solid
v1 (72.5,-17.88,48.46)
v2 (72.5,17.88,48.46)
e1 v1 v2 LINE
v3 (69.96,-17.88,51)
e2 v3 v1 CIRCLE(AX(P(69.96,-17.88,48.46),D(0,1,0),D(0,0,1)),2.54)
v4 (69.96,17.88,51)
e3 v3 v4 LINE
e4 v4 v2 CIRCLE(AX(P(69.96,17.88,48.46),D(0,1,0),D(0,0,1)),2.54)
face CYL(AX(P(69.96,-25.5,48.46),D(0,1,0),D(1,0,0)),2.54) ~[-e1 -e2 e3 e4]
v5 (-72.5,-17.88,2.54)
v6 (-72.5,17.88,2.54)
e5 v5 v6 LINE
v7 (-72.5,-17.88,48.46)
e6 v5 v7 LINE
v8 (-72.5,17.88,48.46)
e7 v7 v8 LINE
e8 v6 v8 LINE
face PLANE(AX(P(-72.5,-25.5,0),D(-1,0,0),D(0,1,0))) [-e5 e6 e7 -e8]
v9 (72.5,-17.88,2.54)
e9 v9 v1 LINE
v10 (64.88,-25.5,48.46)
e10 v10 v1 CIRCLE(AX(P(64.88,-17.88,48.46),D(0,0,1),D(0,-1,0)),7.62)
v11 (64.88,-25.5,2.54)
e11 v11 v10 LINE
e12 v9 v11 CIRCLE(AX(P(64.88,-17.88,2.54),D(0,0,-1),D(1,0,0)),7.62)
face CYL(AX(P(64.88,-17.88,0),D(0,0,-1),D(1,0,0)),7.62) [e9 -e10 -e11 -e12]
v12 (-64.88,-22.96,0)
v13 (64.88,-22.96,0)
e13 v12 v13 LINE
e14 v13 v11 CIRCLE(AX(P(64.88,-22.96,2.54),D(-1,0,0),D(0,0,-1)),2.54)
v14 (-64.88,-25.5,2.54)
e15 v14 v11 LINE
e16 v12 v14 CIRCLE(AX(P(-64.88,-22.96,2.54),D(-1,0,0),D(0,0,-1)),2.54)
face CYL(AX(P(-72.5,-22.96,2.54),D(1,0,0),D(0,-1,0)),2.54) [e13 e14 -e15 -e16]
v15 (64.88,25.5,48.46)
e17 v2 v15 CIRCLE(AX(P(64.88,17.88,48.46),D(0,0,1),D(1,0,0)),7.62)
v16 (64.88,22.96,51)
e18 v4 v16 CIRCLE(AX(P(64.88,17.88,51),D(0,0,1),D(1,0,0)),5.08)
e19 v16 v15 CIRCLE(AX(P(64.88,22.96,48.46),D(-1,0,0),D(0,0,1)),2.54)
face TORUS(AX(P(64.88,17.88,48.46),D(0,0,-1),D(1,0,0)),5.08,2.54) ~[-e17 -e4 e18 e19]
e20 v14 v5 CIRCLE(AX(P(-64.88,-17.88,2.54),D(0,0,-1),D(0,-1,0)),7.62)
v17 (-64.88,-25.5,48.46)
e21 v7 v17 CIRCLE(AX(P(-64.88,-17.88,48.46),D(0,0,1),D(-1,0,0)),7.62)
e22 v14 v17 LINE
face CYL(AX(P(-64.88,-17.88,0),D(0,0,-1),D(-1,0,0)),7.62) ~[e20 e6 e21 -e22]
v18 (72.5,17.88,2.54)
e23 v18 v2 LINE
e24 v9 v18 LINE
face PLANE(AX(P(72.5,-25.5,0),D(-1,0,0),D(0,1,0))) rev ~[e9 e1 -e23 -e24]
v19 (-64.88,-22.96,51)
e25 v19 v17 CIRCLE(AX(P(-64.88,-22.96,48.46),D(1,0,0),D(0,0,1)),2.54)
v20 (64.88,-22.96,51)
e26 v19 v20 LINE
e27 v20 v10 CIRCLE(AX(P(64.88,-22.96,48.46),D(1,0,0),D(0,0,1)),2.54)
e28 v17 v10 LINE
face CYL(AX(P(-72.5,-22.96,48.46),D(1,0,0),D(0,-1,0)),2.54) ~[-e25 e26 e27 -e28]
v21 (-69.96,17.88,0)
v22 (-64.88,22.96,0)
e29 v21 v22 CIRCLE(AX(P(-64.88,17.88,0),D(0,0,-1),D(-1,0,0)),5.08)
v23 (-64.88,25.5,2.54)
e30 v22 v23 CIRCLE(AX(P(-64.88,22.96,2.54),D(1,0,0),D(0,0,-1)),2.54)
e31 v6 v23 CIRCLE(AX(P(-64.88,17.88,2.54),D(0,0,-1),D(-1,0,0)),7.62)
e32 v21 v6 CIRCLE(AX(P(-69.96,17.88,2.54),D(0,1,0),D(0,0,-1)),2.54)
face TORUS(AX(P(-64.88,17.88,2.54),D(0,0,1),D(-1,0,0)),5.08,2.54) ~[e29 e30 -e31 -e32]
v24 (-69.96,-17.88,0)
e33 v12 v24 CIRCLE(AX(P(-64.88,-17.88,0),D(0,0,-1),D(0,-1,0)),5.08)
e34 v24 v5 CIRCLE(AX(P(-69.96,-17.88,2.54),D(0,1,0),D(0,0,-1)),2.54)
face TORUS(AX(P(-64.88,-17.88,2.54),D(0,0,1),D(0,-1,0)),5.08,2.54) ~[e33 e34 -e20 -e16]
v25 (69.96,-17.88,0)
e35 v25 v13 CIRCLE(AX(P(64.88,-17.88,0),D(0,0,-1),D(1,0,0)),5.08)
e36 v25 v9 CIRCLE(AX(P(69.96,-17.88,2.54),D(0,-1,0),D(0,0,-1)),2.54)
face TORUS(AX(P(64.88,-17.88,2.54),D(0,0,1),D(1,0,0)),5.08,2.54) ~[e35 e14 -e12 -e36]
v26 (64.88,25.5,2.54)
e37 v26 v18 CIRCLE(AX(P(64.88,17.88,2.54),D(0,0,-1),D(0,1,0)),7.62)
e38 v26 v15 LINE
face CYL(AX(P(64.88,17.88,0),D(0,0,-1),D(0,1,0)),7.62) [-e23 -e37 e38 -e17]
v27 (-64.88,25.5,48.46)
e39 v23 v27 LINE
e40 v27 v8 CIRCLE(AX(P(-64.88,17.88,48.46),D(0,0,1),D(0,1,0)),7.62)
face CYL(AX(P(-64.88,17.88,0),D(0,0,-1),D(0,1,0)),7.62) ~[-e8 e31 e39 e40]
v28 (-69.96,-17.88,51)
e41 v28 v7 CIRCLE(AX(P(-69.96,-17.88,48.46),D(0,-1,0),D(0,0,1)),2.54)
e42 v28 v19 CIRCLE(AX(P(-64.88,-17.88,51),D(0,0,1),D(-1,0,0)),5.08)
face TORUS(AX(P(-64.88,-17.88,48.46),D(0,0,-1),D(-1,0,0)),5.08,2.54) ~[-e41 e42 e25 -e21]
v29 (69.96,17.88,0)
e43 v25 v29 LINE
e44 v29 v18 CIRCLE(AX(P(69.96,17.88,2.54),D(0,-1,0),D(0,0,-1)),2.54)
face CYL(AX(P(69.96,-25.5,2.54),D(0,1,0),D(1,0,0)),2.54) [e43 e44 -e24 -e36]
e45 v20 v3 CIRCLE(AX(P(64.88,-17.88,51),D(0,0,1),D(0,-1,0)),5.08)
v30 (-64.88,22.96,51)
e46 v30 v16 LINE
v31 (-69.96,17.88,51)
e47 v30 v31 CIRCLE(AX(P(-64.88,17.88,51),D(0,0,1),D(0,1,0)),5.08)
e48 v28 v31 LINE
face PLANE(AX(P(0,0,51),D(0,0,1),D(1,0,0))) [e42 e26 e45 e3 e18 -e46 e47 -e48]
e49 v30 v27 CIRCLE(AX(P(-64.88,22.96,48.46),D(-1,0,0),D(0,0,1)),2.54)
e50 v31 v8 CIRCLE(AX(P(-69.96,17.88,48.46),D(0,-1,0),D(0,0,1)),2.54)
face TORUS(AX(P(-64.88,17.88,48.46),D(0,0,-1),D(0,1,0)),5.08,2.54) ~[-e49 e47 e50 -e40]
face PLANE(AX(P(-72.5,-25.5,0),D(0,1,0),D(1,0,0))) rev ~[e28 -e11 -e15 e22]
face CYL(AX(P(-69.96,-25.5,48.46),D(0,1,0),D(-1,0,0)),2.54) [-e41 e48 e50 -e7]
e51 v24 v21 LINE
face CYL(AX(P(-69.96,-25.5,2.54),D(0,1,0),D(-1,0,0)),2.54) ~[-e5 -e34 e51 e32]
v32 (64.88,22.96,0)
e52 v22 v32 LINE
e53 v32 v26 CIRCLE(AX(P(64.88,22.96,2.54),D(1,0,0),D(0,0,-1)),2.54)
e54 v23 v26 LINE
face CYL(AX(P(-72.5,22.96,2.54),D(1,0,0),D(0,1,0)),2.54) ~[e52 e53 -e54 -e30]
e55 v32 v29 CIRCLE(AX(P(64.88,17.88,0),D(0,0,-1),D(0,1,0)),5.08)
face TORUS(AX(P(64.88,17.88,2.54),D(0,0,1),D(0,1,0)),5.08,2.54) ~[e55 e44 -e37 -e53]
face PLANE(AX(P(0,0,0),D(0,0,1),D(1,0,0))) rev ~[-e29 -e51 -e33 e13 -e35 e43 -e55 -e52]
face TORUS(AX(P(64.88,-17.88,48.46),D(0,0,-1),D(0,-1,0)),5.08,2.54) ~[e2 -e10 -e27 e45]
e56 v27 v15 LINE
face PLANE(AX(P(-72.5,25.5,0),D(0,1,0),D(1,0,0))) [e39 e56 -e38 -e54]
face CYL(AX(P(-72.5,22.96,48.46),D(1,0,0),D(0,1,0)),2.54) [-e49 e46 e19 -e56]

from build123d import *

# Parameters (mm, degrees)
F0_W         = 145
F0_H         = 51
F1_DEPTH     = 51
F2_R         = 2.54
F3_T1_DEPTH  = 51
F3_T4_ANGLE  = 90
F3_T6_ANGLE  = 90
F3_T8_ANGLE  = 90
F3_T10_ANGLE = 90
F3_T12_ANGLE = 90
F3_T14_ANGLE = 90
F3_T16_ANGLE = 90
F3_T18_ANGLE = 90


# Not quite as in the source:
# - a fillet or chamfer that OpenCascade refuses, or shapes differently, is made with other operations: its cross-section is extruded or revolved along the edge and cut away or added


with BuildPart() as f1:
    # F0 (on Top) → F1 (new body)
    with BuildSketch(Plane.XY):
        Rectangle(F0_W, F0_H)
    extrude(amount=F1_DEPTH)

    # F2
    f2_edges = [f1.edges().sort_by_distance(p)[0] for p in [
        (0, -25.5, 51),
        (0, 25.5, 51),
        (0, -25.5, 0),
        (0, 25.5, 0),
        (-72.5, 0, 0),
        (-72.5, 0, 51),
        (72.5, 0, 0),
        (72.5, 0, 51),
    ]]
    fillet(f2_edges, radius=F2_R)

    # F3: fillet of radius 7.62 on 4 edges, made by hand

    # F3_s2 → F3_t1 (cut)
    with BuildSketch(Plane.XY):
        with BuildLine():
            ThreePointArc((72.5, -17.88), (70.2681536726, -23.2681536726), (64.88, -25.5))
            Line((64.88, -25.5), (72.5, -25.5))
            Line((72.5, -25.5), (72.5, -17.88))
        make_face()
        with BuildLine():
            ThreePointArc((64.88, 25.5), (70.2681536726, 23.2681536726), (72.5, 17.88))
            Line((72.5, 17.88), (72.5, 25.5))
            Line((72.5, 25.5), (64.88, 25.5))
        make_face()
        with BuildLine():
            ThreePointArc((-72.5, -17.88), (-70.2681536726, -23.2681536726), (-64.88, -25.5))
            Line((-64.88, -25.5), (-72.5, -25.5))
            Line((-72.5, -25.5), (-72.5, -17.88))
        make_face()
        with BuildLine():
            ThreePointArc((-64.88, 25.5), (-70.2681536726, 23.2681536726), (-72.5, 17.88))
            Line((-72.5, 17.88), (-72.5, 25.5))
            Line((-72.5, 25.5), (-64.88, 25.5))
        make_face()
    extrude(amount=F3_T1_DEPTH, mode=Mode.SUBTRACT)

    # F3_s3 → F3_t4 (revolve, cut)
    with BuildSketch(Plane.XZ.offset(-17.88)):
        with BuildLine():
            ThreePointArc((-69.96, 0), (-71.7560512242, 0.7439487758), (-72.5, 2.54))
            Line((-72.5, 2.54), (-72.5, 0))
            Line((-72.5, 0), (-69.96, 0))
        make_face()
    revolve(axis=Axis((-64.88, 17.88, 0), (0, 0, -1)), revolution_arc=F3_T4_ANGLE, mode=Mode.SUBTRACT)

    # F3_s5 → F3_t6 (revolve, cut)
    with BuildSketch(Plane.YZ.offset(-64.88)):
        with BuildLine():
            ThreePointArc((22.96, 51), (24.7560512242, 50.2560512242), (25.5, 48.46))
            Line((25.5, 48.46), (25.5, 51))
            Line((25.5, 51), (22.96, 51))
        make_face()
    revolve(axis=Axis((-64.88, 17.88, 51), (0, 0, 1)), revolution_arc=F3_T6_ANGLE, mode=Mode.SUBTRACT)

    # F3_s7 → F3_t8 (revolve, cut)
    with BuildSketch(Plane.YZ.offset(-64.88)):
        with BuildLine():
            ThreePointArc((-22.96, 0), (-24.7560512242, 0.7439487758), (-25.5, 2.54))
            Line((-25.5, 2.54), (-25.5, 0))
            Line((-25.5, 0), (-22.96, 0))
        make_face()
    revolve(axis=Axis((-64.88, -17.88, 0), (0, 0, -1)), revolution_arc=F3_T8_ANGLE, mode=Mode.SUBTRACT)

    # F3_s9 → F3_t10 (revolve, cut)
    with BuildSketch(Plane.XZ.offset(17.88)):
        with BuildLine():
            ThreePointArc((-69.96, 51), (-71.7560512242, 50.2560512242), (-72.5, 48.46))
            Line((-72.5, 48.46), (-72.5, 51))
            Line((-72.5, 51), (-69.96, 51))
        make_face()
    revolve(axis=Axis((-64.88, -17.88, 51), (0, 0, 1)), revolution_arc=F3_T10_ANGLE, mode=Mode.SUBTRACT)

    # F3_s11 → F3_t12 (revolve, cut)
    with BuildSketch(Plane.YZ.offset(64.88)):
        with BuildLine():
            ThreePointArc((22.96, 0), (24.7560512242, 0.7439487758), (25.5, 2.54))
            Line((25.5, 2.54), (25.5, 0))
            Line((25.5, 0), (22.96, 0))
        make_face()
    revolve(axis=Axis((64.88, 17.88, 0), (0, 0, -1)), revolution_arc=F3_T12_ANGLE, mode=Mode.SUBTRACT)

    # F3_s13 → F3_t14 (revolve, cut)
    with BuildSketch(Plane.XZ.offset(-17.88)):
        with BuildLine():
            ThreePointArc((69.96, 51), (71.7560512242, 50.2560512242), (72.5, 48.46))
            Line((72.5, 48.46), (72.5, 51))
            Line((72.5, 51), (69.96, 51))
        make_face()
    revolve(axis=Axis((64.88, 17.88, 51), (0, 0, 1)), revolution_arc=F3_T14_ANGLE, mode=Mode.SUBTRACT)

    # F3_s15 → F3_t16 (revolve, cut)
    with BuildSketch(Plane.XZ.offset(17.88)):
        with BuildLine():
            ThreePointArc((69.96, 0), (71.7560512242, 0.7439487758), (72.5, 2.54))
            Line((72.5, 2.54), (72.5, 0))
            Line((72.5, 0), (69.96, 0))
        make_face()
    revolve(axis=Axis((64.88, -17.88, 0), (0, 0, -1)), revolution_arc=F3_T16_ANGLE, mode=Mode.SUBTRACT)

    # F3_s17 → F3_t18 (revolve, cut)
    with BuildSketch(Plane.YZ.offset(64.88)):
        with BuildLine():
            ThreePointArc((-22.96, 51), (-24.7560512242, 50.2560512242), (-25.5, 48.46))
            Line((-25.5, 48.46), (-25.5, 51))
            Line((-25.5, 51), (-22.96, 51))
        make_face()
    revolve(axis=Axis((64.88, -17.88, 51), (0, 0, 1)), revolution_arc=F3_T18_ANGLE, mode=Mode.SUBTRACT)


solid = f1.part
